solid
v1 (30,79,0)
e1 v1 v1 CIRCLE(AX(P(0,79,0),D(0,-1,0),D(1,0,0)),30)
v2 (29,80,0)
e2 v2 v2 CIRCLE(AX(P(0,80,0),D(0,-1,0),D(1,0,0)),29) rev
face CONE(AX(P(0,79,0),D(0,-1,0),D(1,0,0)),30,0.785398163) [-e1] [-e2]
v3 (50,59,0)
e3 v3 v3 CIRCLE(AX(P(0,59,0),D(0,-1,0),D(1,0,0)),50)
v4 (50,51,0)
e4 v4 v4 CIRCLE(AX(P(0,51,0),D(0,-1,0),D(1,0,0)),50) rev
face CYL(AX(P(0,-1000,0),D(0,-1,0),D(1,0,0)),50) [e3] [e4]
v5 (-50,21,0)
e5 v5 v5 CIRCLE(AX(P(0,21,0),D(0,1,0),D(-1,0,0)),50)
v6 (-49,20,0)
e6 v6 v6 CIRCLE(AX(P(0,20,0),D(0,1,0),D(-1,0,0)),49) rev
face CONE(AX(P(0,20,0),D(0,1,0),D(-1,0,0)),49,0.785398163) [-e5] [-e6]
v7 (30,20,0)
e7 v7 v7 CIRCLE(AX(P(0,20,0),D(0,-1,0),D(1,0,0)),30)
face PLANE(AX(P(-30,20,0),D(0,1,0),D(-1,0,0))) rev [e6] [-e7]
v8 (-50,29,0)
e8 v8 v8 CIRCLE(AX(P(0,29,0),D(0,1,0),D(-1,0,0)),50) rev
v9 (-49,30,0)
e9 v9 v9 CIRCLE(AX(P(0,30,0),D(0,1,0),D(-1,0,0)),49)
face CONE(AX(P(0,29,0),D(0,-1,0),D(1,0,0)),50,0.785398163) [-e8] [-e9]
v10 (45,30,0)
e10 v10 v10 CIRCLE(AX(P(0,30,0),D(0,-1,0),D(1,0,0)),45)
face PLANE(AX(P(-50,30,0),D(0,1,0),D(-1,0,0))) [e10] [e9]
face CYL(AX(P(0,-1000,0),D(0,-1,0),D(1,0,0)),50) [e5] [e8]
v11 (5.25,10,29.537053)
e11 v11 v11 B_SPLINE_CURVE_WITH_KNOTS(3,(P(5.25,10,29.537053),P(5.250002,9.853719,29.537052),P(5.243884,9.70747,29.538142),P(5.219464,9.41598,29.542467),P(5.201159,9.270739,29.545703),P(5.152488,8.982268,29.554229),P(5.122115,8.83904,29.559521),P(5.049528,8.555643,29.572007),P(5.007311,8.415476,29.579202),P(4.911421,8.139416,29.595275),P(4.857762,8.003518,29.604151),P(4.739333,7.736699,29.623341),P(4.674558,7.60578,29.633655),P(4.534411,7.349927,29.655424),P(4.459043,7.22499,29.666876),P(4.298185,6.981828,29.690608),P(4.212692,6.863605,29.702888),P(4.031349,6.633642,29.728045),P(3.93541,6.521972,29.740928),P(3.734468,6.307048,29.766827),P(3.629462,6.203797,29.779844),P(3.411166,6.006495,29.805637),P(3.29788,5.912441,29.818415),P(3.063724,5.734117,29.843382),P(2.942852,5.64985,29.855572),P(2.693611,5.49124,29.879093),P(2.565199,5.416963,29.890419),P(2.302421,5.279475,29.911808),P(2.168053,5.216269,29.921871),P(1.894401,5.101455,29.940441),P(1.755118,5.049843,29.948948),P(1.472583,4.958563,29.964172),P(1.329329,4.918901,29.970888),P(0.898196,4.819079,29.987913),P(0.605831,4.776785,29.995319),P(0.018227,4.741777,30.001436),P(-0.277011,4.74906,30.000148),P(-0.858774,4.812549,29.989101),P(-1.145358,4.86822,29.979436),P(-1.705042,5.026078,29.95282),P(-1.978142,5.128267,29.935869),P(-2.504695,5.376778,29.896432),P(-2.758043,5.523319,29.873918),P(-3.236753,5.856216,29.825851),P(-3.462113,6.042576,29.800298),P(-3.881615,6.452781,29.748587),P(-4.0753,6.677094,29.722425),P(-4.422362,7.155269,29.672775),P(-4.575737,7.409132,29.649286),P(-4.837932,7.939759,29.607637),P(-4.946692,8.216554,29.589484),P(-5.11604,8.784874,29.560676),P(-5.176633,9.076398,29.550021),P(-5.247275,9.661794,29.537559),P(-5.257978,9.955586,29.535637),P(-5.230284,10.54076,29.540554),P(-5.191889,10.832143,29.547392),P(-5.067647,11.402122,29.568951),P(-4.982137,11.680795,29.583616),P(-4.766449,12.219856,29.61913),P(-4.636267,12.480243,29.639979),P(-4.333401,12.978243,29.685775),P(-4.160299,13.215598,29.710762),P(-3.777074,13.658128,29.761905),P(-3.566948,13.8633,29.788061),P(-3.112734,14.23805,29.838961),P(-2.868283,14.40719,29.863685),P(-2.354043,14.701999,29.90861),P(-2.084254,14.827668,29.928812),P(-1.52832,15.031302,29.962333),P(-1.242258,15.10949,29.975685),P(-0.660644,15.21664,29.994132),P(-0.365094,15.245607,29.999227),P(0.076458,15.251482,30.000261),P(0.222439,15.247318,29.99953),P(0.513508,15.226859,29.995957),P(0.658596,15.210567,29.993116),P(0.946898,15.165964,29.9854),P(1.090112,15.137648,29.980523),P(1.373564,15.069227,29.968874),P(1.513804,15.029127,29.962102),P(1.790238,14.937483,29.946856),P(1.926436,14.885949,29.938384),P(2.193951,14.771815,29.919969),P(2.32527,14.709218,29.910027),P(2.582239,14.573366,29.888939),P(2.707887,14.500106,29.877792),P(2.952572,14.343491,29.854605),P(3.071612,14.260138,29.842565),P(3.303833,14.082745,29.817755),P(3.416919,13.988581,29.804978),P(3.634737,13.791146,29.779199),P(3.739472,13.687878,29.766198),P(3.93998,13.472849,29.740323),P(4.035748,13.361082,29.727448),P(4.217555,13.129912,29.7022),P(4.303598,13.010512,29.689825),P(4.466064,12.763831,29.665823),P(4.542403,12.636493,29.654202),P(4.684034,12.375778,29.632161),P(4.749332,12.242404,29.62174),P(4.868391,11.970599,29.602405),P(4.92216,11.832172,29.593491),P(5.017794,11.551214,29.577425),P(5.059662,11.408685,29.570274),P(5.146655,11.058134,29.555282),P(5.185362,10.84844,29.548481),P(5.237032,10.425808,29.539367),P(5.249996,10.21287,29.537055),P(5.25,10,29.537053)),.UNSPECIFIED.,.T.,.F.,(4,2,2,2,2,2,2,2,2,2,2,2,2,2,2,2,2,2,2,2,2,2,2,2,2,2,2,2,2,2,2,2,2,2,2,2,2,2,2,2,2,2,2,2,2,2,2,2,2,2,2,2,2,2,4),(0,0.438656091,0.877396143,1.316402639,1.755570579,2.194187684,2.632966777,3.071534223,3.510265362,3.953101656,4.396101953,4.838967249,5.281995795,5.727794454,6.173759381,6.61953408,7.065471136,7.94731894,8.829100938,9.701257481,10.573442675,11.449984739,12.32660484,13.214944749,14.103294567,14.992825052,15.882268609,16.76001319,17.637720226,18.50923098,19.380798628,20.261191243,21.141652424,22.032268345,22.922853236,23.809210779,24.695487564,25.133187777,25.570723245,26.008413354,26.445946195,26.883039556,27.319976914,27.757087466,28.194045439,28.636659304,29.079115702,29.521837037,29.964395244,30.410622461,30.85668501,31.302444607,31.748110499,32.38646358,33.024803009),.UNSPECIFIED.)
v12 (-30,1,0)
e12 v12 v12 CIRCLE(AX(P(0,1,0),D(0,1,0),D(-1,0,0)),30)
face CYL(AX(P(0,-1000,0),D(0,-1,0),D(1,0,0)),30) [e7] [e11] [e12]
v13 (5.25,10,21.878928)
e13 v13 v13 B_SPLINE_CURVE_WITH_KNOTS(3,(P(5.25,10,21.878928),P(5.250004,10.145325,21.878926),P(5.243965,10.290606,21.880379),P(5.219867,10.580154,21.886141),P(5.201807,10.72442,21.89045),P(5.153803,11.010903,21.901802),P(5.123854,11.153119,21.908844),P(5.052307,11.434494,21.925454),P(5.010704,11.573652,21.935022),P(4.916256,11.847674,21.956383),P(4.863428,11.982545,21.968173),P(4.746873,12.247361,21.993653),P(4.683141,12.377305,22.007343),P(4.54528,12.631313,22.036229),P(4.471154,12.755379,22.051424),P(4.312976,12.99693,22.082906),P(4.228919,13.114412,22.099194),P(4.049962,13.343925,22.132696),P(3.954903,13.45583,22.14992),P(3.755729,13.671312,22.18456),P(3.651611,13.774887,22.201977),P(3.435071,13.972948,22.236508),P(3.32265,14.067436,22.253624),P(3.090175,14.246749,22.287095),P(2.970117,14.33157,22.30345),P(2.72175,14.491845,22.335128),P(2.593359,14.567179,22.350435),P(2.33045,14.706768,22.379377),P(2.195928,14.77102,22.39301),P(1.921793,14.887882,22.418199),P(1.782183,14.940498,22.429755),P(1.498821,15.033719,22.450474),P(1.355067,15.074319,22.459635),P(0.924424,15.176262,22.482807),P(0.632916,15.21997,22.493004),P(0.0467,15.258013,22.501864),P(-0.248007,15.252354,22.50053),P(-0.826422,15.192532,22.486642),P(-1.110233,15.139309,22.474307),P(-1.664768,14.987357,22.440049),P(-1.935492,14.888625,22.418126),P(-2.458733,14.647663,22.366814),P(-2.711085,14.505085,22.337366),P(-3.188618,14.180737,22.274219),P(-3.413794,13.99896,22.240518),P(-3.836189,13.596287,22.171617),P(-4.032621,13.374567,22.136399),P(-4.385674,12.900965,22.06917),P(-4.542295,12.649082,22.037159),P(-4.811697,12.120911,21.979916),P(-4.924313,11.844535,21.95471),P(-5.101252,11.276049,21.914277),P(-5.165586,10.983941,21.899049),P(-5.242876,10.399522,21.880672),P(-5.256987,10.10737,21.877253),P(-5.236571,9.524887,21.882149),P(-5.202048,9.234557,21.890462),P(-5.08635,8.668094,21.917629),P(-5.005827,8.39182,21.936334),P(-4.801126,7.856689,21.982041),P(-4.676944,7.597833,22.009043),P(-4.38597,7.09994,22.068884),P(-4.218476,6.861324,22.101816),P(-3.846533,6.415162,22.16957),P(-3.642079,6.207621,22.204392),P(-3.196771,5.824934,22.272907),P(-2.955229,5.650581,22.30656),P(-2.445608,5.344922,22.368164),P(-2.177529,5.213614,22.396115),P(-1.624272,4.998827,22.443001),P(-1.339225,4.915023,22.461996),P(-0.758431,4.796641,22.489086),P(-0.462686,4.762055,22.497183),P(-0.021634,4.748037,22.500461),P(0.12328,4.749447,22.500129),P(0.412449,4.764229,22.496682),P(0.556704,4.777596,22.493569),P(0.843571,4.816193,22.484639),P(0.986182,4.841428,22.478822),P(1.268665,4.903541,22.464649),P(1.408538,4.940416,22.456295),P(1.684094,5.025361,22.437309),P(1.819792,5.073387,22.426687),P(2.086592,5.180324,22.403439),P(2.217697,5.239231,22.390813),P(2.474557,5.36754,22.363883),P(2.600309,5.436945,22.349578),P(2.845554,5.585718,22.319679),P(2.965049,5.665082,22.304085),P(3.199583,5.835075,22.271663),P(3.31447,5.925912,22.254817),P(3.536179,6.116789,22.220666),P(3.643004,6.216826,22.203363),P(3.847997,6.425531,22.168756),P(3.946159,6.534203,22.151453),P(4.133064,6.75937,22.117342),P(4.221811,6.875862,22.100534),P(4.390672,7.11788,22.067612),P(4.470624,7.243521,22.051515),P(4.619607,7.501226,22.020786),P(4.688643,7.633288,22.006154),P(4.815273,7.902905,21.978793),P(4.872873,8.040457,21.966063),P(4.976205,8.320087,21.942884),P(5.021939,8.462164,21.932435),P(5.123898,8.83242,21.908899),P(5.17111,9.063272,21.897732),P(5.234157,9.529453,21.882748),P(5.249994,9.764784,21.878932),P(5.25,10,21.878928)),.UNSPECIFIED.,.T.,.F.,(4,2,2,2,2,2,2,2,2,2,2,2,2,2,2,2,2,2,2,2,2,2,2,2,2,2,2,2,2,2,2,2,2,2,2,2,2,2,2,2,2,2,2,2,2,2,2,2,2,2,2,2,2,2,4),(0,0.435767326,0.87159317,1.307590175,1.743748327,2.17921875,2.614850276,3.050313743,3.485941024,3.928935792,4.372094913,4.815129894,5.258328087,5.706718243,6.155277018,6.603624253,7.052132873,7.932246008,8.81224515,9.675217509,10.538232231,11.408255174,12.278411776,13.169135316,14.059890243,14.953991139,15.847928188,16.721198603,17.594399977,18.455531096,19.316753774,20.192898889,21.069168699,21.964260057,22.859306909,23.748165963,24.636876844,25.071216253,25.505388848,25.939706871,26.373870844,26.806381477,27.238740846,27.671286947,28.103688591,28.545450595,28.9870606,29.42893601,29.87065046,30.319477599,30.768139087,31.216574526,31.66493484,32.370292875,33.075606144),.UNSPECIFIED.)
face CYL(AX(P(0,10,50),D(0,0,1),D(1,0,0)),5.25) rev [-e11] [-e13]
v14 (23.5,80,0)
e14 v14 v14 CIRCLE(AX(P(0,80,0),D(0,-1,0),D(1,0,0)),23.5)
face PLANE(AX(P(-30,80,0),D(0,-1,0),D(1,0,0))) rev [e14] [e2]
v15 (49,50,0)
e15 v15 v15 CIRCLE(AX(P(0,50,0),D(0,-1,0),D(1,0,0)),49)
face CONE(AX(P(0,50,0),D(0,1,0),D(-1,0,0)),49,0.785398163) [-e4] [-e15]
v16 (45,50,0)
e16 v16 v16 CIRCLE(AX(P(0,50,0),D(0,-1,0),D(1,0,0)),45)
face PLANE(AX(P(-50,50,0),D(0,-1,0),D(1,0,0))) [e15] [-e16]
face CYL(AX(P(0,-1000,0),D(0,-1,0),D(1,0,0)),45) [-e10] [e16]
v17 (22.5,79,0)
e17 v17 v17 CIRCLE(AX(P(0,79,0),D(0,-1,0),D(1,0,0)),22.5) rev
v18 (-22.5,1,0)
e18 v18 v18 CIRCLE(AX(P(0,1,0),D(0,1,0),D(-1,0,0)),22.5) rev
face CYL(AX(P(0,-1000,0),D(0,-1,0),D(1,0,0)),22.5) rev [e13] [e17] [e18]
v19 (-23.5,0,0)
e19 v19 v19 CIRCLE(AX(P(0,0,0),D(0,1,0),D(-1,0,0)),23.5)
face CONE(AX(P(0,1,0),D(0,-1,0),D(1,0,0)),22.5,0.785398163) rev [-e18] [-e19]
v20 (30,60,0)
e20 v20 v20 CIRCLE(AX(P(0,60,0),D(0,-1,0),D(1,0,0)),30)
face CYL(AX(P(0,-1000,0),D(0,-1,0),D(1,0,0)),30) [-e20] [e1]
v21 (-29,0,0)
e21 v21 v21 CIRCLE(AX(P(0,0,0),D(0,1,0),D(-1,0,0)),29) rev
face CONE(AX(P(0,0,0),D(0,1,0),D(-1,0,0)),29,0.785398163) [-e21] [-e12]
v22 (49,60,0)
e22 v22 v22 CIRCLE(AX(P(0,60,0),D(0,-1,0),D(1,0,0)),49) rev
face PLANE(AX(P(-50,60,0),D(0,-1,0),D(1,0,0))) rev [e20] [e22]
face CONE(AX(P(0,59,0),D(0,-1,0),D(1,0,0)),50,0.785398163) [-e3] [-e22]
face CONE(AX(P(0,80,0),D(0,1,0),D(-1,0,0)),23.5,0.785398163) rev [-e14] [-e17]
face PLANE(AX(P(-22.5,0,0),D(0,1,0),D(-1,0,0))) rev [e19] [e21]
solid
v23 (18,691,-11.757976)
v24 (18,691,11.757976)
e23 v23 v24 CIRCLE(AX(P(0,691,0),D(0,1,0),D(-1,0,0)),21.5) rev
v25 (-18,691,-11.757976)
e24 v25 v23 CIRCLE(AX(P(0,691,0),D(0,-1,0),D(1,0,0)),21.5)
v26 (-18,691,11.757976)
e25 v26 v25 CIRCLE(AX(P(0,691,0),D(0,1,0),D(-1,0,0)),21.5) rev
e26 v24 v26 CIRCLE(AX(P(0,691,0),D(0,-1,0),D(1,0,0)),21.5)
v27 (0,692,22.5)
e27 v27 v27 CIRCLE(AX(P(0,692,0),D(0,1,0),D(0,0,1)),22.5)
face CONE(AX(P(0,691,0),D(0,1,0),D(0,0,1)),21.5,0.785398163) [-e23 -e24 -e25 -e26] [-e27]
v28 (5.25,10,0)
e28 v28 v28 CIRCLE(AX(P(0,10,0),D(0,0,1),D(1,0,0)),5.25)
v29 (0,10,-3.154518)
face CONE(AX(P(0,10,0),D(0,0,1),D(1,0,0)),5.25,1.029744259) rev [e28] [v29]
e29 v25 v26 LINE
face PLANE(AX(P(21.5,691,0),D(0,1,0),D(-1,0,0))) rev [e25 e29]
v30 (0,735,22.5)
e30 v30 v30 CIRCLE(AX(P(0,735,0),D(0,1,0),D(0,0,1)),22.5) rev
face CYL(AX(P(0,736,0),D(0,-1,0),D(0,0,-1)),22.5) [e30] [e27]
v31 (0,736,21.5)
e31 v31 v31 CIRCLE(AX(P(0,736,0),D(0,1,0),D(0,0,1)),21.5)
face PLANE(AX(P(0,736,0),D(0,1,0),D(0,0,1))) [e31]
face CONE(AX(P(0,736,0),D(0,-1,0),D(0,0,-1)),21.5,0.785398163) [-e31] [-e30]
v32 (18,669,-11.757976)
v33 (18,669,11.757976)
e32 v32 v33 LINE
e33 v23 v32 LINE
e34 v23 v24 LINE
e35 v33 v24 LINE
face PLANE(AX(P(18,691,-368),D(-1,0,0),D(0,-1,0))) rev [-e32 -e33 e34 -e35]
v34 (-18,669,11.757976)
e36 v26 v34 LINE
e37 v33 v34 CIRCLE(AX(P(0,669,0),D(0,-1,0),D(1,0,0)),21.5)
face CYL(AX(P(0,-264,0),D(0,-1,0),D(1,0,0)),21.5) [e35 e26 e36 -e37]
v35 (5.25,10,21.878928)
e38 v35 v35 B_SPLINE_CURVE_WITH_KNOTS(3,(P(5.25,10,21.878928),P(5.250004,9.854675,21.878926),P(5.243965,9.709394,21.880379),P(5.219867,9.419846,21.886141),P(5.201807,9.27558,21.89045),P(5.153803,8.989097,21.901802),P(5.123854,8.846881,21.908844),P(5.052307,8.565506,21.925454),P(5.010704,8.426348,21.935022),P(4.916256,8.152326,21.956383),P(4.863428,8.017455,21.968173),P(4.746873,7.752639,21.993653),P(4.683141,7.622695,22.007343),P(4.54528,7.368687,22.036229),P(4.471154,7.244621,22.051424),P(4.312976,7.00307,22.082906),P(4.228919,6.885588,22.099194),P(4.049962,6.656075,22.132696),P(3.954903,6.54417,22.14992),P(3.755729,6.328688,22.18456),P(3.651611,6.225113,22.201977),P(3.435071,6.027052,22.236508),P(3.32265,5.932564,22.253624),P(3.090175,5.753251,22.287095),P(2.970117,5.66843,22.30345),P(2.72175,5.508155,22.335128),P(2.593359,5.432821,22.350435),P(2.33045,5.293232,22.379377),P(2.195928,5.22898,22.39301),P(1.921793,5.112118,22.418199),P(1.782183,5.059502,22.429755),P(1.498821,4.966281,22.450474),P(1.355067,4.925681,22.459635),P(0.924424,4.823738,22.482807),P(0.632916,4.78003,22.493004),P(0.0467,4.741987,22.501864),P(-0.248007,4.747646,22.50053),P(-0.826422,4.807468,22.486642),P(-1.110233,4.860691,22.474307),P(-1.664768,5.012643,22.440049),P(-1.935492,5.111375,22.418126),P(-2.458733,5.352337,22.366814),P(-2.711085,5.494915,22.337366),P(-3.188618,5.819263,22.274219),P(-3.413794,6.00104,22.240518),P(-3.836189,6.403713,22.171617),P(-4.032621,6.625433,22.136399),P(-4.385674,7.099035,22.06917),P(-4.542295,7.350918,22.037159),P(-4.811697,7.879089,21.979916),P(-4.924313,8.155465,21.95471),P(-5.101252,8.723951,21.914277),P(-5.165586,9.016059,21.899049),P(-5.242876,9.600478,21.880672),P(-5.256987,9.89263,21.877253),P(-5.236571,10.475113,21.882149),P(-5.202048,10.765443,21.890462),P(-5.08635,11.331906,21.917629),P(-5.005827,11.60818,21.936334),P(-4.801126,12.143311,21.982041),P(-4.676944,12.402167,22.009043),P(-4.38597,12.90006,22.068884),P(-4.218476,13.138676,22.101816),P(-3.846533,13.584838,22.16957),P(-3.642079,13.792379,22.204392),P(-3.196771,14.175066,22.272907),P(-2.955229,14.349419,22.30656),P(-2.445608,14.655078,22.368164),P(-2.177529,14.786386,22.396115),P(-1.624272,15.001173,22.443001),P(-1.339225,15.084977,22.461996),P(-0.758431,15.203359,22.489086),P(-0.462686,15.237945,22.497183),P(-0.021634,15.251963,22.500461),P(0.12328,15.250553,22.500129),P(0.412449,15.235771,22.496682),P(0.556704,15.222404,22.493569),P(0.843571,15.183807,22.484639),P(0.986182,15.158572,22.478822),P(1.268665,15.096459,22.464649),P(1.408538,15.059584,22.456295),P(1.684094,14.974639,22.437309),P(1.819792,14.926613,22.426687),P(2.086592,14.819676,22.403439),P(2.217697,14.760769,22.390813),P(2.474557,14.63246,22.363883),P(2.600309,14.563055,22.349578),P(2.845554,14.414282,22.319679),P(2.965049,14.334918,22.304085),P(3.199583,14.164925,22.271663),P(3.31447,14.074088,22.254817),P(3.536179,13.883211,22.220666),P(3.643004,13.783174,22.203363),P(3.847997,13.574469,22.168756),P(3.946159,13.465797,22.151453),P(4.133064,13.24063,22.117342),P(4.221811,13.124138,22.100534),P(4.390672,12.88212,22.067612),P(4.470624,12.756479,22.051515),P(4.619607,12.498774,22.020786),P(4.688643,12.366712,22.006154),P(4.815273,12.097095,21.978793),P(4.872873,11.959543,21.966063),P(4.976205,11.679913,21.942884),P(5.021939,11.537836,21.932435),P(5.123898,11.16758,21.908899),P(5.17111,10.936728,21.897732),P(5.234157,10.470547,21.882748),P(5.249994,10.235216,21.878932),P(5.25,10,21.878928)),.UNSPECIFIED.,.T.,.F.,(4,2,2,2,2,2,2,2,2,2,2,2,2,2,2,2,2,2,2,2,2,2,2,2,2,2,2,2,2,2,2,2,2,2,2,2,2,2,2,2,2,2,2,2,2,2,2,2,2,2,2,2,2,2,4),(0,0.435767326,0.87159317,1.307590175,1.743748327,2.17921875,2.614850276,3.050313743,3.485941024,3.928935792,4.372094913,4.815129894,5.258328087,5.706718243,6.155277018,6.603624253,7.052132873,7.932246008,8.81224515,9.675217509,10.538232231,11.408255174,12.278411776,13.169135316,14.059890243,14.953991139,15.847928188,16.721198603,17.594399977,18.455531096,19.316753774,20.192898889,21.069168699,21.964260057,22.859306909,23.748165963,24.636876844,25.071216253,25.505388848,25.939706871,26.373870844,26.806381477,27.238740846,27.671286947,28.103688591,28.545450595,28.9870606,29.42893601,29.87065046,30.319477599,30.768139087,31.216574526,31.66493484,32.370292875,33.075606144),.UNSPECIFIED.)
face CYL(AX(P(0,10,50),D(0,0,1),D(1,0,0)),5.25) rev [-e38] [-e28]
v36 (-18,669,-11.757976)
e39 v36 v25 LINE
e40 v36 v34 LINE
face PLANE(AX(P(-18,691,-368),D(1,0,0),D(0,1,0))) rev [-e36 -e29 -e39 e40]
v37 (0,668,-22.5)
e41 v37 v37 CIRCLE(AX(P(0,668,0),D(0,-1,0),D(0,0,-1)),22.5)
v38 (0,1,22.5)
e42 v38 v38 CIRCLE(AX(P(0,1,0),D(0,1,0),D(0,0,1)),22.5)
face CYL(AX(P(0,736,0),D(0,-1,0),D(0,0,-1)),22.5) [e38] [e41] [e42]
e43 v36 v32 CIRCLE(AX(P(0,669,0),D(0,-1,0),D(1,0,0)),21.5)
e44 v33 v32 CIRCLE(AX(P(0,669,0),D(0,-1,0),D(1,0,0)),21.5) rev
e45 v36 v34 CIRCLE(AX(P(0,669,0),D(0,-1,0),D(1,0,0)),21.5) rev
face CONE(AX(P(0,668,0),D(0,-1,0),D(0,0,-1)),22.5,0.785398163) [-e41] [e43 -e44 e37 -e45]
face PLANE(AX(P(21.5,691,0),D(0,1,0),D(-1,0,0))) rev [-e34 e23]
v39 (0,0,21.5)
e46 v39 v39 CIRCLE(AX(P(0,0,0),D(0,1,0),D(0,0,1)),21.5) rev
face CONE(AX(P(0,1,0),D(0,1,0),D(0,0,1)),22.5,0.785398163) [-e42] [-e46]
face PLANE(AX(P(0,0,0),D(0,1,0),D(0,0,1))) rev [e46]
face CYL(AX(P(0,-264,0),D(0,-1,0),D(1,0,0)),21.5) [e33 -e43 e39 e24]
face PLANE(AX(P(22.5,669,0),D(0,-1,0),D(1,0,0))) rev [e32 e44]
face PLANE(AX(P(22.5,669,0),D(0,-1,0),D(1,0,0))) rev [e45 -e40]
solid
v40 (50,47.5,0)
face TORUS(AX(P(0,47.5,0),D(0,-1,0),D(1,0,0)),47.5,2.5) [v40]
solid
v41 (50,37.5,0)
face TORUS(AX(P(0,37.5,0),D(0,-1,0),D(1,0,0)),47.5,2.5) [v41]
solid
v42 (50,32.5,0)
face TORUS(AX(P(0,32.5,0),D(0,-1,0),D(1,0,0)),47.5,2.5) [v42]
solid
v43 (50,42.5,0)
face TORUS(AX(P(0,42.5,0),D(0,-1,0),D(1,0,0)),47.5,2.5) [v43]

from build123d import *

# Parameters (mm, degrees)
SKETCH_1_R          = 22.5
EXTRUDE_1_DEPTH     = 736
SKETCH_2_W          = 1
SKETCH_2_H          = 22
SKETCH_3_W          = 4.5
SKETCH_3_H          = 22
CUT_EXTRUDE_1_DEPTH = 368
CHAMFER_1_SIZE      = 1
CHAMFER_2_SIZE      = 1
CHAMFER_3_SIZE      = 1
SKETCH_5_W          = 5
SKETCH_5_H          = 20
SKETCH_6_R          = 2.5
CHAMFER_4_SIZE      = 1
CHAMFER_5_SIZE      = 1
CHAMFER_6_SIZE      = 1


with BuildPart() as part:
    # 草圖1 → 填料-伸長1 (new body)
    with BuildSketch(Plane(origin=(0, 0, 0), x_dir=(1, 0, 0), z_dir=(0, 1, 0))):
        with Locations(Location((0, 0, 0), (0, 0, 270))):
            Circle(SKETCH_1_R)
    extrude(amount=EXTRUDE_1_DEPTH)

    # 草圖2 → 除料-旋轉1 (revolve, cut)
    with BuildSketch(Plane.XY):
        with Locations((22, 680)):
            Rectangle(SKETCH_2_W, SKETCH_2_H)
    revolve(axis=Axis((0, -264, 0), (0, 1, 0)), mode=Mode.SUBTRACT)

    # 草圖3 → 除料-伸長1 (cut, symmetric)
    with BuildSketch(Plane.XY):
        with Locations((-20.25, 680)):
            Rectangle(SKETCH_3_W, SKETCH_3_H)
        with Locations((20.25, 680)):
            Rectangle(SKETCH_3_W, SKETCH_3_H)
    extrude(amount=CUT_EXTRUDE_1_DEPTH, both=True, mode=Mode.SUBTRACT)

    # 導角1
    chamfer_1_edges = [part.edges().sort_by_distance(p)[0] for p in [
        (0, 691, -22.5),
        (0, 669, -22.5),
    ]]
    chamfer(chamfer_1_edges, length=CHAMFER_1_SIZE - 0.0001)  # a hair under: the kernel refuses the full size

    # 導角2
    chamfer_2_edges = [part.edges().sort_by_distance(p)[0] for p in [
        (0, 736, -22.5),
    ]]
    chamfer(chamfer_2_edges, length=CHAMFER_2_SIZE)

    # 導角3
    chamfer_3_edges = [part.edges().sort_by_distance(p)[0] for p in [
        (0, 0, -22.5),
    ]]
    chamfer(chamfer_3_edges, length=CHAMFER_3_SIZE)


with BuildPart() as body_2:
    # 草圖4 → 旋轉1 (revolve)
    with BuildSketch(Plane.XY, mode=Mode.PRIVATE) as revolve_1_sk:
        Polygon((-22.5, 80), (-22.5, 0), (-30, 0), (-30, 20), (-50, 20), (-50, 60), (-30, 60), (-30, 80), align=None)
    revolve(revolve_1_sk.sketch.rotate(Axis((0, -1000, 0), (0, 1, 0)), 180), axis=Axis((0, -1000, 0), (0, 1, 0)))

    # 草圖5 → 除料-旋轉2 (revolve, cut)
    with BuildSketch(Plane.XY, mode=Mode.PRIVATE) as cut_revolve_2_sk:
        with Locations((-47.5, 40)):
            Rectangle(SKETCH_5_W, SKETCH_5_H)
    revolve(cut_revolve_2_sk.sketch.rotate(Axis((0, -1000, 0), (0, 1, 0)), 180), axis=Axis((0, -1000, 0), (0, 1, 0)), mode=Mode.SUBTRACT)

    # 導角4
    chamfer_4_edges = [body_2.edges().sort_by_distance(p)[0] for p in [
        (-50, 50, 0),
        (-50, 30, 0),
        (-50, 60, 0),
        (-50, 20, 0),
    ]]
    chamfer(chamfer_4_edges, length=CHAMFER_4_SIZE)

    # 導角5
    chamfer_5_edges = [body_2.edges().sort_by_distance(p)[0] for p in [
        (-22.5, 0, 0),
        (-22.5, 80, 0),
    ]]
    chamfer(chamfer_5_edges, length=CHAMFER_5_SIZE)

    # 導角6
    chamfer_6_edges = [body_2.edges().sort_by_distance(p)[0] for p in [
        (-30, 80, 0),
        (-30, 0, 0),
    ]]
    chamfer(chamfer_6_edges, length=CHAMFER_6_SIZE)


with BuildPart() as body_3:
    # 草圖6 → 旋轉2 (revolve)
    with BuildSketch(Plane.XY, mode=Mode.PRIVATE) as revolve_2_sk:
        with Locations((-47.5, 47.5)):
            Circle(SKETCH_6_R)
        with Locations((-47.5, 42.5)):
            Circle(SKETCH_6_R)
        with Locations((-47.5, 37.5)):
            Circle(SKETCH_6_R)
        with Locations((-47.5, 32.5)):
            Circle(SKETCH_6_R)
    revolve(revolve_2_sk.sketch.rotate(Axis((0, -1000, 0), (0, 1, 0)), 180), axis=Axis((0, -1000, 0), (0, 1, 0)))


with BuildPart() as m12x1_5_1_tool:
    # 草圖9 → M12x1.5 螺紋孔1 (revolve)
    with BuildSketch(Plane(origin=(0, 10, 50), x_dir=(0, -1, 0), z_dir=(1, 0, 0))):
        Polygon((0, 0), (0, 53.15451825), (5.25, 50), (5.25, 0), align=None)
    revolve(axis=Axis((0, 10, 56.35), (0, 0, -1)))


with BuildPart() as part_1:
    add(part.part)

    # M12x1.5 螺紋孔1: cut by m12x1_5_1_tool
    add(m12x1_5_1_tool.part, mode=Mode.SUBTRACT)


with BuildPart() as body_2_1:
    add(body_2.part)

    # M12x1.5 螺紋孔1: cut by m12x1_5_1_tool
    add(m12x1_5_1_tool.part, mode=Mode.SUBTRACT)


solid = Compound([body_3.part, part_1.part, body_2_1.part])
